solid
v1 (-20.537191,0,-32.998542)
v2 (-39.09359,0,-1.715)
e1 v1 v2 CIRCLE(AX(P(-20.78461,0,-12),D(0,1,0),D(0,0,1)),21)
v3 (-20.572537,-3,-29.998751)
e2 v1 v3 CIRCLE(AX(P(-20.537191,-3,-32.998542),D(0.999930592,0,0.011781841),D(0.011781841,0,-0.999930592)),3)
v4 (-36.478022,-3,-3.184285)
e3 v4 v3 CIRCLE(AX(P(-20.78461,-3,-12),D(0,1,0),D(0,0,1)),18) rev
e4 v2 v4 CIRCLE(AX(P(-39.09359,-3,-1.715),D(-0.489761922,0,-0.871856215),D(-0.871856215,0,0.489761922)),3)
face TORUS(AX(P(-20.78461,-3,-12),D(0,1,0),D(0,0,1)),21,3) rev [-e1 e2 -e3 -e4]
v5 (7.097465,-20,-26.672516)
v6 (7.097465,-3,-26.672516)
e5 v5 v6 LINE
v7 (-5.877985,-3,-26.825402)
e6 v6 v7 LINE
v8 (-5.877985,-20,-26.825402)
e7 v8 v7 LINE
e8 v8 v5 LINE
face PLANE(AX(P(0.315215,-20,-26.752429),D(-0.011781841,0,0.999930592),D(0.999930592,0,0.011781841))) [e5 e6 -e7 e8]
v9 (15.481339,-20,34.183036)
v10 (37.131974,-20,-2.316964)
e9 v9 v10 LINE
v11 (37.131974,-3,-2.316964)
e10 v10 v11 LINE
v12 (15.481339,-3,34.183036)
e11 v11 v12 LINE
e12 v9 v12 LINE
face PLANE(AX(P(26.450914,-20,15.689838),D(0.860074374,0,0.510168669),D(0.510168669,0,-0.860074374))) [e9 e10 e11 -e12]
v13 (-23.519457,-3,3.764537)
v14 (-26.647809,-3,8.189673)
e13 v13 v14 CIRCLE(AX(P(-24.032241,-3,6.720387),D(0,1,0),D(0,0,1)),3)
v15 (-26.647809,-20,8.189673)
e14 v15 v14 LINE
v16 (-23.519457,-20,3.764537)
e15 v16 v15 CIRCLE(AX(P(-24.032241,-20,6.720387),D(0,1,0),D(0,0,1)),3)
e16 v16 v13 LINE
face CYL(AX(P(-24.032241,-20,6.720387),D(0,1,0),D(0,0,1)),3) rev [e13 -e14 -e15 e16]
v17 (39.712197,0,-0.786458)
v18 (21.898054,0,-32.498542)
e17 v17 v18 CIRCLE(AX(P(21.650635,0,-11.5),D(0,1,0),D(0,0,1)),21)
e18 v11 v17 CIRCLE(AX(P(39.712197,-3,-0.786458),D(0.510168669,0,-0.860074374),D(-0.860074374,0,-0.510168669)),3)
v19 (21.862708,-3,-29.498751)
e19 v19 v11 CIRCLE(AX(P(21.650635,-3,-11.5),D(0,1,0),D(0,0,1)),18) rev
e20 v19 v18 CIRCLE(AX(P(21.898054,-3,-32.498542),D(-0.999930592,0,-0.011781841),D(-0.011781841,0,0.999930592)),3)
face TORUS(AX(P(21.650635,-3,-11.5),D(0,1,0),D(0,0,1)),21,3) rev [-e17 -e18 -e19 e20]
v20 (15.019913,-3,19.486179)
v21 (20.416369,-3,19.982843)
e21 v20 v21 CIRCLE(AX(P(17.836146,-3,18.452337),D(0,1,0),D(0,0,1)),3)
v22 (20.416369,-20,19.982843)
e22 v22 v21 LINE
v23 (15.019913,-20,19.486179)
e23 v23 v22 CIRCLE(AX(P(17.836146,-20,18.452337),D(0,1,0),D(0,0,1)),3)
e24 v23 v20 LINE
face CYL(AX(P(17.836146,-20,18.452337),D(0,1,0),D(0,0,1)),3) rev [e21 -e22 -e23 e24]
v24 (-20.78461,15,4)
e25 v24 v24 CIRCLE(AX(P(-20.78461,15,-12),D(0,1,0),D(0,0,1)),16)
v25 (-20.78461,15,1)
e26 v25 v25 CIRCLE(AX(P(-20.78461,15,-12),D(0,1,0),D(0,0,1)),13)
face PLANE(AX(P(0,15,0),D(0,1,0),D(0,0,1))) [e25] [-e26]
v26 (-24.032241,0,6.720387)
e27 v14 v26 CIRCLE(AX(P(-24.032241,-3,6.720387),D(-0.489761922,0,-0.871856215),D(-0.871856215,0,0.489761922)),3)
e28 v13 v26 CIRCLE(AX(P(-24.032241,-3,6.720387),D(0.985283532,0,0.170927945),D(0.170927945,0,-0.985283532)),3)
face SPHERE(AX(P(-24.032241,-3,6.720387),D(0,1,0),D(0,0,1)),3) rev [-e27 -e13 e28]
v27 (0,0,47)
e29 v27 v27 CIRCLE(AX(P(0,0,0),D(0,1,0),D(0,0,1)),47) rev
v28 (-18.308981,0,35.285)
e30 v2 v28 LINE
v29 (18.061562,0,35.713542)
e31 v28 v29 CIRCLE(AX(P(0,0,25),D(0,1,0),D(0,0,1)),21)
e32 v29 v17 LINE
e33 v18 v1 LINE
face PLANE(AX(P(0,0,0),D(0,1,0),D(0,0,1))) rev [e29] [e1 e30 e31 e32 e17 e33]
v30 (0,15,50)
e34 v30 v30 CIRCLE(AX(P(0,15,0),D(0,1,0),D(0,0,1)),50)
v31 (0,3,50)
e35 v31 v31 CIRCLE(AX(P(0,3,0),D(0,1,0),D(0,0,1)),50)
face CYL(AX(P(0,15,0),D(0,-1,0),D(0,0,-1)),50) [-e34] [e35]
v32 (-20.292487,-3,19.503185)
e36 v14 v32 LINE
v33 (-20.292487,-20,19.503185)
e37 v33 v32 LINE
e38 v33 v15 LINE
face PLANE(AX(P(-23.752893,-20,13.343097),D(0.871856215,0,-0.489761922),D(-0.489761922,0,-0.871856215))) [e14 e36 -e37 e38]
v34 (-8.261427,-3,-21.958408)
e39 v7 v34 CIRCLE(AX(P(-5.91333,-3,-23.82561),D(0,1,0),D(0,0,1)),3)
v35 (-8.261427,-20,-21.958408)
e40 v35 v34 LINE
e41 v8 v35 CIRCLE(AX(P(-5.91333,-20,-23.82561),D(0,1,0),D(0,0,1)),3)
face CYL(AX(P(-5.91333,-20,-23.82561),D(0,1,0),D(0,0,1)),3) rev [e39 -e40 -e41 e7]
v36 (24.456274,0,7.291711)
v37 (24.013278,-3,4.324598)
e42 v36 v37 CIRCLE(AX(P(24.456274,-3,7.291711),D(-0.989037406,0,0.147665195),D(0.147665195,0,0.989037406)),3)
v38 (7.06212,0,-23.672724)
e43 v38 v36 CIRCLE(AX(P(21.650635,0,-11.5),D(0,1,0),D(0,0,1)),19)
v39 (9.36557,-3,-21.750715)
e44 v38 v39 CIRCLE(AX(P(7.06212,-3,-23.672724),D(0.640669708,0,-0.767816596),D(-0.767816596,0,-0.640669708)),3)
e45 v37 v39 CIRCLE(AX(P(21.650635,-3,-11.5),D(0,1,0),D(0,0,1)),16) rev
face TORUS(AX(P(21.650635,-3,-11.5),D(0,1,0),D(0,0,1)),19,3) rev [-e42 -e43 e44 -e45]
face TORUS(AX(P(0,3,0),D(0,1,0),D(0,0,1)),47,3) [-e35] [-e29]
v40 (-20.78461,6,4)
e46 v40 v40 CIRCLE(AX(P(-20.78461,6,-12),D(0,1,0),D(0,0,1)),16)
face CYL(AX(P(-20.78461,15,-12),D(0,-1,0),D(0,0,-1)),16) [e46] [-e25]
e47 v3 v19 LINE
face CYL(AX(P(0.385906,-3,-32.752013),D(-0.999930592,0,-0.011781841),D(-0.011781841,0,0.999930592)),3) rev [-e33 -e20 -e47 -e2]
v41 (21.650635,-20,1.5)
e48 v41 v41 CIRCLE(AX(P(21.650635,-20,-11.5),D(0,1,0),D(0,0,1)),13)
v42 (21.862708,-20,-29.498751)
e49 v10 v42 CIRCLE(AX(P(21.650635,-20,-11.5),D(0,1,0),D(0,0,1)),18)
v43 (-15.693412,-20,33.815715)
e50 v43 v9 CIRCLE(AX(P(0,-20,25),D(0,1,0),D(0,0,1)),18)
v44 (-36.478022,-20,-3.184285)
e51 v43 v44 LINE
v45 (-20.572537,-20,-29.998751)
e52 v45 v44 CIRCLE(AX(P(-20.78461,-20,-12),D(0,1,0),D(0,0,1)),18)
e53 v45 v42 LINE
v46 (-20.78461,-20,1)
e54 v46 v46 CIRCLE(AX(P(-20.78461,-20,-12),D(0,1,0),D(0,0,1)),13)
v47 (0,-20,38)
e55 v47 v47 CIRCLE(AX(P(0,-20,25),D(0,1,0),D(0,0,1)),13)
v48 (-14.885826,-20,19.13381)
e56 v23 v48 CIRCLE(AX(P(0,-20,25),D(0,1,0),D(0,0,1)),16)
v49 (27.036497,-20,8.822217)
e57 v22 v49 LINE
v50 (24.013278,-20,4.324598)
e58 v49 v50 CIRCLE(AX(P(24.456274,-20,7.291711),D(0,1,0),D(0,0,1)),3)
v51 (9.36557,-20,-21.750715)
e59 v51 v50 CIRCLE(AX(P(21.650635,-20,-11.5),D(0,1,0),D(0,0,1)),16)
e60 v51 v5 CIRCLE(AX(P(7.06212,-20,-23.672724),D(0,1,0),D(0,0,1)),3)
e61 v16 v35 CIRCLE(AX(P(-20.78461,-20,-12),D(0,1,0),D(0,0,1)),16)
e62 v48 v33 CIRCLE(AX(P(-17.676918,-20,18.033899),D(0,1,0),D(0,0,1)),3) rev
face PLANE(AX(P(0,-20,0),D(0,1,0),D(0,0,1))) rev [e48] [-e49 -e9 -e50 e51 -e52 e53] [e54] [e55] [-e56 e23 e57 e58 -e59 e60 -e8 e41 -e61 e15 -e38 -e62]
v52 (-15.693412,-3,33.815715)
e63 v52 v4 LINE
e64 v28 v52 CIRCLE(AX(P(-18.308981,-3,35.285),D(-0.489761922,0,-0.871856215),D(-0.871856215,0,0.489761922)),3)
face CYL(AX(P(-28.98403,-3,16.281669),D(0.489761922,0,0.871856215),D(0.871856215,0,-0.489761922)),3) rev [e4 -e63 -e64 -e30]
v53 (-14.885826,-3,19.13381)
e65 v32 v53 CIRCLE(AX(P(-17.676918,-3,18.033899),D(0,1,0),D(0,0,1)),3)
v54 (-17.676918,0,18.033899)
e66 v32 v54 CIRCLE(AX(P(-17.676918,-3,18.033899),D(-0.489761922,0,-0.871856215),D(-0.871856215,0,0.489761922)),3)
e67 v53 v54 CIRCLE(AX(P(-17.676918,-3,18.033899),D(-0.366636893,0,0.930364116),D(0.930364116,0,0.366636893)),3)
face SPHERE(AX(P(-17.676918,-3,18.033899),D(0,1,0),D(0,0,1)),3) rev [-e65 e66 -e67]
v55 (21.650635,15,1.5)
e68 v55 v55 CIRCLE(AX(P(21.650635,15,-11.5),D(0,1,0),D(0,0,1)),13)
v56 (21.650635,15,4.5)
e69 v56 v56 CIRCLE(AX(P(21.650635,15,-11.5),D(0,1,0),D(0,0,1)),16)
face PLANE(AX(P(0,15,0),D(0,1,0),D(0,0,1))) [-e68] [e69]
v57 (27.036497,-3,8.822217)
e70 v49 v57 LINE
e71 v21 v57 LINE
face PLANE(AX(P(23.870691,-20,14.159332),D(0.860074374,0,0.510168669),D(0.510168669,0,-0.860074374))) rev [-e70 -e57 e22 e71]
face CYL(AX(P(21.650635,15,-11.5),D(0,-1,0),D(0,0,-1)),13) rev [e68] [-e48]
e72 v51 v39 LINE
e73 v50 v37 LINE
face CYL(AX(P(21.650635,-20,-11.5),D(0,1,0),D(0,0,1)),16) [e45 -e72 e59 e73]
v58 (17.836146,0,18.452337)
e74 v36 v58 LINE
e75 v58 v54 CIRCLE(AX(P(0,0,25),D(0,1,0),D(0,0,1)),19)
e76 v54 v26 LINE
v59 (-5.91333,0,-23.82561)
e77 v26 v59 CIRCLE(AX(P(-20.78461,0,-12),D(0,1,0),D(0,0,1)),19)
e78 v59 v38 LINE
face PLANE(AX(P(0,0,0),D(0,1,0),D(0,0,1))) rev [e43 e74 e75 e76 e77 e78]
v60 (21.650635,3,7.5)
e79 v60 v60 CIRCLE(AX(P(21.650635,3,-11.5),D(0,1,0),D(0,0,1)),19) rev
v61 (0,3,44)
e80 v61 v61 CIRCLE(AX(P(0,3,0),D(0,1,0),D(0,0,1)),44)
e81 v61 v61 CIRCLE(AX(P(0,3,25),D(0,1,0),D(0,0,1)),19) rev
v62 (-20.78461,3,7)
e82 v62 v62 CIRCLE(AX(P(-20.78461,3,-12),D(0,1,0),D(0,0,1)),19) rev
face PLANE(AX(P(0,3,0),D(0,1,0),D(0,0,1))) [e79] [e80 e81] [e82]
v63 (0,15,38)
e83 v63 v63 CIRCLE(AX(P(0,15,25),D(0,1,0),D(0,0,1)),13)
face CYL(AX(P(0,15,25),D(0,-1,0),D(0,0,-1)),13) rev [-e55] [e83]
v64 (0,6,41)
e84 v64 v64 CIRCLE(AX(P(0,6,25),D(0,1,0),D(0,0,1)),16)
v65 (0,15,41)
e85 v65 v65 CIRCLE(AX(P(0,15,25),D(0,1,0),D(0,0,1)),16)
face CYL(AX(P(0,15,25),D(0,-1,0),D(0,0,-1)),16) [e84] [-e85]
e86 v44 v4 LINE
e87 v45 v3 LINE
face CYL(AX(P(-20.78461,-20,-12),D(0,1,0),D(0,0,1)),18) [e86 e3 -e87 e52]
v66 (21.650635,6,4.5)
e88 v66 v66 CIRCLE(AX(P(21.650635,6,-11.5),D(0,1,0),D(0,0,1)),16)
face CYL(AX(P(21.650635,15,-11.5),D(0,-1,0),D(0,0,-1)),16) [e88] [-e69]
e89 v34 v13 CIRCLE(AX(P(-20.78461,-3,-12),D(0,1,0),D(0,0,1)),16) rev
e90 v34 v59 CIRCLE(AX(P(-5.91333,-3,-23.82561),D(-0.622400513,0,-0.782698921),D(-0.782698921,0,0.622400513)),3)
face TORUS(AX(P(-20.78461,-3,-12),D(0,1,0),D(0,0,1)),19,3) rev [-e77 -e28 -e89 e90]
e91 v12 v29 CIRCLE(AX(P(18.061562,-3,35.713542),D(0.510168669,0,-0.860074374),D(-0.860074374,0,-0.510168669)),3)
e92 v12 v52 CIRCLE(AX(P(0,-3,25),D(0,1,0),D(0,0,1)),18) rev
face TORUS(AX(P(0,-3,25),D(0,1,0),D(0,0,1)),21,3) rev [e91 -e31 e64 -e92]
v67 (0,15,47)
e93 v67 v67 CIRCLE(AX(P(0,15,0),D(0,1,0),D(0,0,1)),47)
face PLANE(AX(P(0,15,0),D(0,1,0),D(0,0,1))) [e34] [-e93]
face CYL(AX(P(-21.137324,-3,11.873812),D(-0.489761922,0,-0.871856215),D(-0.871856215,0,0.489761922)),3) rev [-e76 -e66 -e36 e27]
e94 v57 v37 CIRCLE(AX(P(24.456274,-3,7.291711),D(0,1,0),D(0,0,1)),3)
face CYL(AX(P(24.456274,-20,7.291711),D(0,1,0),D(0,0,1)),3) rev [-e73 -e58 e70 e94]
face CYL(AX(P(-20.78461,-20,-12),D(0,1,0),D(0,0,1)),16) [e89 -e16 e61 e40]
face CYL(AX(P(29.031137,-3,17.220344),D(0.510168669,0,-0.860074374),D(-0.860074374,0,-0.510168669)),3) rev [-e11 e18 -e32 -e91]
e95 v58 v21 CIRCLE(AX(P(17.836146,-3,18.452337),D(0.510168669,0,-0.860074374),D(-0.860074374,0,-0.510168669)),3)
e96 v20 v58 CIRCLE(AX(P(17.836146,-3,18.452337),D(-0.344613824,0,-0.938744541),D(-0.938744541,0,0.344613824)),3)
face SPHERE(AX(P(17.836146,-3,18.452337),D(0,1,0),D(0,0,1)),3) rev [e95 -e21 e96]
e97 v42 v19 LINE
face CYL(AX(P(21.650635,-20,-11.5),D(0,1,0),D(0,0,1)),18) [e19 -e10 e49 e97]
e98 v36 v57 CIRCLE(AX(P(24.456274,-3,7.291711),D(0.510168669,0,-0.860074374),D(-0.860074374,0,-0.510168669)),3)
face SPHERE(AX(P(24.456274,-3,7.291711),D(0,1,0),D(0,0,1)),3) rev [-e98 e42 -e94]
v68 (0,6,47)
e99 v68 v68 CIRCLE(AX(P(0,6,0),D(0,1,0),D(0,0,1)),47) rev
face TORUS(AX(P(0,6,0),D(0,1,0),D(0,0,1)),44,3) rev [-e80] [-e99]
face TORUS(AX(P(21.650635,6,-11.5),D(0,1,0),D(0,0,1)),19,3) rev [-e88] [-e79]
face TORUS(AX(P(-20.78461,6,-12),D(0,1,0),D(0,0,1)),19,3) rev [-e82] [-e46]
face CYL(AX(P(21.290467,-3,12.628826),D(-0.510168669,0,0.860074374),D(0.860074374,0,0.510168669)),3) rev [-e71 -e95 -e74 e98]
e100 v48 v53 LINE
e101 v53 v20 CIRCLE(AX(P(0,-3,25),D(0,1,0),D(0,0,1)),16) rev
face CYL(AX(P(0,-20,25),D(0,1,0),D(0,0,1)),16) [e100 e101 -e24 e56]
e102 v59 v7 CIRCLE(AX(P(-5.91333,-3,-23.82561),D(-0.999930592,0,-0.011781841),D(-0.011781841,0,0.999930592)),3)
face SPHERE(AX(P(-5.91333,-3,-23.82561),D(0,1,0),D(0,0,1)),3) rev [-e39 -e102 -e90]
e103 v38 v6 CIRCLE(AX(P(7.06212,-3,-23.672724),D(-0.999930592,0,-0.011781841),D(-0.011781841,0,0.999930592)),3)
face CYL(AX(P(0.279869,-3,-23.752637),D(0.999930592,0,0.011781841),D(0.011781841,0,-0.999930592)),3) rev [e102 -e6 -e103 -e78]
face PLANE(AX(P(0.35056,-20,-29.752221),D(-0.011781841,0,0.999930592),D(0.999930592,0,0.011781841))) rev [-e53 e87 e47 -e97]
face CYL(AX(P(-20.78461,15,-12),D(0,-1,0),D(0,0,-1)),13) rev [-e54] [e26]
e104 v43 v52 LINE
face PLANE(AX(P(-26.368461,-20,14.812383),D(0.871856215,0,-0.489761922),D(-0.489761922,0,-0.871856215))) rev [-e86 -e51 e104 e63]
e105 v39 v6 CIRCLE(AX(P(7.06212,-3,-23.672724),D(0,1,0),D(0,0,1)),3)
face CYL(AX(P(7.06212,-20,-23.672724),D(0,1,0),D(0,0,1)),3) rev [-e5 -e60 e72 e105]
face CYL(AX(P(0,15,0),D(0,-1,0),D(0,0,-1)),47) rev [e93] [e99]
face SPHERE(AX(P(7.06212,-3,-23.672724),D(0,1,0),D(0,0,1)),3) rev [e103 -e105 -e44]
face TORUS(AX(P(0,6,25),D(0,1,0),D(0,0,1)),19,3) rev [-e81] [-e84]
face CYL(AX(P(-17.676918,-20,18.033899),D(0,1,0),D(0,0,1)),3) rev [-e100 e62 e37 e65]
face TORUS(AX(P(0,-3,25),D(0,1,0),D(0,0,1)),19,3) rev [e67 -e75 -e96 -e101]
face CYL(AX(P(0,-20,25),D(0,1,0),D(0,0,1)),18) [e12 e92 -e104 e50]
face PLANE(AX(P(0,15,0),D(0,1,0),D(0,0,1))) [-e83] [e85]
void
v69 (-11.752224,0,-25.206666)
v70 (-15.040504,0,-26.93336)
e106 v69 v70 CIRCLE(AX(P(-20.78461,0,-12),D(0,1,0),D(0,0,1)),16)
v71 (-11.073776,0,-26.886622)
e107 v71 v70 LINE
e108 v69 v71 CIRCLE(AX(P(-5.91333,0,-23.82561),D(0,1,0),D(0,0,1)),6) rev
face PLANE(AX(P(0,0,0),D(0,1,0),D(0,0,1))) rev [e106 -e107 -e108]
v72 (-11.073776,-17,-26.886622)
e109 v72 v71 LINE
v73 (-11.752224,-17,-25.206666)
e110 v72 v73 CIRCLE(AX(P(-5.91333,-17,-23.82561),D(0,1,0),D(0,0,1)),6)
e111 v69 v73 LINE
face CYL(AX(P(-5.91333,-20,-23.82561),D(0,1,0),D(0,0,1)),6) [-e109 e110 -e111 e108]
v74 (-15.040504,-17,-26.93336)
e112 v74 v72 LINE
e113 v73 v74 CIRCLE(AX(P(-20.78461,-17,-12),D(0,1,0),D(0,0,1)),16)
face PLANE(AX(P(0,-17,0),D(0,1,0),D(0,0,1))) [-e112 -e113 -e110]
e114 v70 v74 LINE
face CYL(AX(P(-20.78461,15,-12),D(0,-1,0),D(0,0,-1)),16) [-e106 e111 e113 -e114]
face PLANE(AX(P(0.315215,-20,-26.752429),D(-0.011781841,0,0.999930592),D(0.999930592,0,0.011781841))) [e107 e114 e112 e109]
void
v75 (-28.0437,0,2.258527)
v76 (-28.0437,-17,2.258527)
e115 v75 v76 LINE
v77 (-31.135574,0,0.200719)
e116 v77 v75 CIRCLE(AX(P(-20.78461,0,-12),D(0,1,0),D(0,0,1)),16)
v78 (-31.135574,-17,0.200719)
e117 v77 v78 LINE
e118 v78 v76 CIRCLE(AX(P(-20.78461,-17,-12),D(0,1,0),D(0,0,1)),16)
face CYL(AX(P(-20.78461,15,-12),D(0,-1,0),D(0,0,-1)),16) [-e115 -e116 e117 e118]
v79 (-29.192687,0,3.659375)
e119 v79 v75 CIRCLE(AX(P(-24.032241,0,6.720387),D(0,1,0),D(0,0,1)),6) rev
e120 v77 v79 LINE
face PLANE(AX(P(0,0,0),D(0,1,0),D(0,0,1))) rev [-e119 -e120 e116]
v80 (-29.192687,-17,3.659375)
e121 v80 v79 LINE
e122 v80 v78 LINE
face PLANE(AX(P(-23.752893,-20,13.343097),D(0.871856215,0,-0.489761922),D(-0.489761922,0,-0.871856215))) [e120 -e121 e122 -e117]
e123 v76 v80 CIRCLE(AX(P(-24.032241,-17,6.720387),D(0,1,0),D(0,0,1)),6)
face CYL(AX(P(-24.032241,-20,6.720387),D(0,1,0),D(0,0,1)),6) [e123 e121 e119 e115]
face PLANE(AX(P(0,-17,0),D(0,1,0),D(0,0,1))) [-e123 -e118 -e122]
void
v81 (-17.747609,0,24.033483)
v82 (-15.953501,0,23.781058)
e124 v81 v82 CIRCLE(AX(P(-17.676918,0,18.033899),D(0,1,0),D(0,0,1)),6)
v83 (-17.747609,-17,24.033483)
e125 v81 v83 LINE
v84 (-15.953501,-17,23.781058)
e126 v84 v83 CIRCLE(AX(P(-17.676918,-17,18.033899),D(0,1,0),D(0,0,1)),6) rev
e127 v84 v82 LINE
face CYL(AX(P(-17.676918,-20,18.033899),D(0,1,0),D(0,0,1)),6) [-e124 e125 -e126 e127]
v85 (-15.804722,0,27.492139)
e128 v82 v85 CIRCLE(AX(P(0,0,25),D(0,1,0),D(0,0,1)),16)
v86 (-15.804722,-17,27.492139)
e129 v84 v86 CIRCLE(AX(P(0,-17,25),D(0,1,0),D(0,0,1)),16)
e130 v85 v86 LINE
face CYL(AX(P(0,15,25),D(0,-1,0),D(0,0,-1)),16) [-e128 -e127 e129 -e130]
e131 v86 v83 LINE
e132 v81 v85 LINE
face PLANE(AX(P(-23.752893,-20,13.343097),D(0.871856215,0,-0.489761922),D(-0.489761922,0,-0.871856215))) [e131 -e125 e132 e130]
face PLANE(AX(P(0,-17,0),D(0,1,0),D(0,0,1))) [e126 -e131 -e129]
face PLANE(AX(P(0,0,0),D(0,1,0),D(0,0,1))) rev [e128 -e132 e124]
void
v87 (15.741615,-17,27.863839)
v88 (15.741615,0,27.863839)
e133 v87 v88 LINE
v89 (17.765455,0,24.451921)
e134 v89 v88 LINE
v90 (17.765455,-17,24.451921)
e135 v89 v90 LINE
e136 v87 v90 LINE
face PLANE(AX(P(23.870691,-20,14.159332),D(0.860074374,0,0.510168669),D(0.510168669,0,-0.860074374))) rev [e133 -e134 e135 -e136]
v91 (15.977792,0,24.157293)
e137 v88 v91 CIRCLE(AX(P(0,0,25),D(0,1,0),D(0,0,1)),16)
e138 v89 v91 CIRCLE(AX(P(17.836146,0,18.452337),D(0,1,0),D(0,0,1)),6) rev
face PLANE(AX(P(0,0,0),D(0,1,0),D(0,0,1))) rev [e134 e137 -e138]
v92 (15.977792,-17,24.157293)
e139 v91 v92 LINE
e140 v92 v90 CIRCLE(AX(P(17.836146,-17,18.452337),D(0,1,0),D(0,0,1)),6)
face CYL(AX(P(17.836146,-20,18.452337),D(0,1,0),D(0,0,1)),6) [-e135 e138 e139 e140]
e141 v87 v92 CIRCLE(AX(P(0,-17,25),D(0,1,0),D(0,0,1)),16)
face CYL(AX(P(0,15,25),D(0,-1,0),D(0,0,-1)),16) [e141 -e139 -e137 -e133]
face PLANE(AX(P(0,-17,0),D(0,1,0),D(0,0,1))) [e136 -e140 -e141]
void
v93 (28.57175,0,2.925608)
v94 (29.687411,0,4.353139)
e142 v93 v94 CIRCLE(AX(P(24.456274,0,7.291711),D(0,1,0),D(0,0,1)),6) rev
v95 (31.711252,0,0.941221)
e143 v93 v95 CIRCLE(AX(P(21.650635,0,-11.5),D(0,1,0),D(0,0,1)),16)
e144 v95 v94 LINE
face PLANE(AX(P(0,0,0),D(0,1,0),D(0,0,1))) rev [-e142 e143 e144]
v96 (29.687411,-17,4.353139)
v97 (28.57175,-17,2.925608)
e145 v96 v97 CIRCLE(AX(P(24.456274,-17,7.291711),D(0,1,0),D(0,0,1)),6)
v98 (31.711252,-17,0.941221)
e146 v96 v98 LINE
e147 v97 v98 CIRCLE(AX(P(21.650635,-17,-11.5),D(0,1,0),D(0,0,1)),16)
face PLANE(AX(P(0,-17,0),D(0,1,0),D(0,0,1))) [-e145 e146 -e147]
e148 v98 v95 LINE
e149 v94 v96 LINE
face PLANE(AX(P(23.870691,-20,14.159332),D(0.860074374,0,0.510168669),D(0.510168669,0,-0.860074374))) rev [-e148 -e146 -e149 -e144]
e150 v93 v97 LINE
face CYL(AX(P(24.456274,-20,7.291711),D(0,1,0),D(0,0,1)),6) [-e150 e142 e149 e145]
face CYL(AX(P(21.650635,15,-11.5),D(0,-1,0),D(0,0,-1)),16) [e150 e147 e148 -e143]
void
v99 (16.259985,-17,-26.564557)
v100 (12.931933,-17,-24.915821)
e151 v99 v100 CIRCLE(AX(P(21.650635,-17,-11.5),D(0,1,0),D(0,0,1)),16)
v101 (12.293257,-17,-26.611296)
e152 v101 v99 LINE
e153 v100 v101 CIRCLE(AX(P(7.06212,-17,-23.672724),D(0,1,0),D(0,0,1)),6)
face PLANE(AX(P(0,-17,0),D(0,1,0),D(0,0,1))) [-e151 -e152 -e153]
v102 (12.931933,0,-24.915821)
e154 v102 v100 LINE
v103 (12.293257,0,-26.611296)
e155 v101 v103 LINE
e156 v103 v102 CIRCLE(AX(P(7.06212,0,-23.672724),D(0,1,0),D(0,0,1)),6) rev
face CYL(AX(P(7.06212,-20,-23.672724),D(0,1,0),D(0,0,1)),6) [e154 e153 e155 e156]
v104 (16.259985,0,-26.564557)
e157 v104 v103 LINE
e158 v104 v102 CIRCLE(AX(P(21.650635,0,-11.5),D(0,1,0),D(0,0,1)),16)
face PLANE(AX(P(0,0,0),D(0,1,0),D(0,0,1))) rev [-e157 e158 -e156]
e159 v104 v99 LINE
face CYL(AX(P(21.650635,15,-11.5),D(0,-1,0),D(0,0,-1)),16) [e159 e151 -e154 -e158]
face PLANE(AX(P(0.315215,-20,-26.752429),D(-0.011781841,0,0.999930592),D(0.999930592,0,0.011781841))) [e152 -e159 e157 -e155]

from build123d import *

# Parameters (mm, degrees)
SKETCH1_R           = 50
SKETCH1_R_2         = 13
BOSS_EXTRUDE1_DEPTH = 15
BOSS_EXTRUDE3_START = -20
SKETCH1_5_R         = 13
BOSS_EXTRUDE3_DEPTH = 20
SHELL1_START        = 3
SHELL1_OUTLINE_R    = 47
SHELL1_OUTLINE_R_2  = 16
SHELL1_DEPTH        = 12
SHELL1_START_2      = -17
SHELL1_2_DEPTH      = 20
FILLET3_R           = 3
FILLET4_R           = 3
FILLET5_R           = 3
SKETCH1_7_R         = 13
BOSS_EXTRUDE4_DEPTH = 3
FILLET6_R           = 3
FILLET7_R           = 3
FILLET8_R           = 3
FILLET9_R           = 3


# Read off the part's stored shape, not the designer's step: Shell1
with BuildPart() as part:
    # Sketch1 → Boss-Extrude1 (new body)
    # profile 1 of 3: a face of its own
    with BuildSketch(Plane(origin=(0, 0, 0), x_dir=(1, 0, 0), z_dir=(0, 1, 0))):
        with Locations(Location((0, 0, 0), (0, 0, 270))):
            Circle(SKETCH1_R)
        with BuildLine():
            ThreePointArc((-15.693411867, -33.815714604), (-0.212073133, -42.998750651), (15.481338733, -34.183036046))
            Line((15.481338733, -34.183036046), (37.131973828, 2.316963954))
            ThreePointArc((37.131973828, 2.316963954), (37.344046961, 20.315714604), (21.862708228, 29.498750651))
            Line((21.862708228, 29.498750651), (-20.572536557, 29.998750651))
            ThreePointArc((-20.572536557, 29.998750651), (-36.265948424, 21.183036046), (-36.478021557, 3.184285396))
            Line((-36.478021557, 3.184285396), (-15.693411867, -33.815714604))
        make_face(mode=Mode.SUBTRACT)
    # profile 2 of 3: a face of its own
    with BuildSketch(Plane(origin=(0, 0, 0), x_dir=(1, 0, 0), z_dir=(0, 1, 0))):
        with BuildLine():
            Line((-15.693411867, -33.815714604), (-36.478021557, 3.184285396))
            ThreePointArc((-36.478021557, 3.184285396), (-36.265948424, 21.183036046), (-20.572536557, 29.998750651))
            Line((-20.572536557, 29.998750651), (21.862708228, 29.498750651))
            ThreePointArc((21.862708228, 29.498750651), (37.344046961, 20.315714604), (37.131973828, 2.316963954))
            Line((37.131973828, 2.316963954), (15.481338733, -34.183036046))
            ThreePointArc((15.481338733, -34.183036046), (-0.212073133, -42.998750651), (-15.693411867, -33.815714604))
        make_face()
        with Locations(Location((-20.784609691, 12, 0), (0, 0, 270))):
            Circle(SKETCH1_R_2, mode=Mode.SUBTRACT)
        with Locations(Location((21.650635095, 11.5, 0), (0, 0, 270))):
            Circle(SKETCH1_R_2, mode=Mode.SUBTRACT)
        with Locations(Location((0, -25, 0), (0, 0, 270))):
            Circle(SKETCH1_R_2, mode=Mode.SUBTRACT)
        with BuildLine():
            ThreePointArc((-5.877984665, 26.825401524), (-8.607603848, 25.145037444), (-8.261426951, 21.958408209))
            ThreePointArc((-8.261426951, 21.958408209), (-7.023419706, 3.837301292), (-23.519456803, -3.764536507))
            ThreePointArc((-23.519456803, -3.764536507), (-26.481910808, -4.988591486), (-26.647809281, -8.189672869))
            Line((-26.647809281, -8.189672869), (-20.292486854, -19.503184805))
            ThreePointArc((-20.292486854, -19.503184805), (-17.472439282, -21.02692232), (-14.885825861, -19.133809716))
            ThreePointArc((-14.885825861, -19.133809716), (0.188509452, -9.001110533), (15.01991265, -19.486178822))
            ThreePointArc((15.01991265, -19.486178822), (17.56120236, -21.439711757), (20.416369394, -19.982843358))
            Line((20.416369394, -19.982843358), (27.036496923, -8.822216719))
            ThreePointArc((27.036496923, -8.822216719), (26.946068533, -5.618115124), (24.013278215, -4.324598494))
            ThreePointArc((24.013278215, -4.324598494), (7.700935658, 3.663809241), (9.365569557, 21.750715328))
            ThreePointArc((9.365569557, 21.750715328), (9.786733851, 24.928303244), (7.097465291, 26.672516227))
            Line((7.097465291, 26.672516227), (-5.877984665, 26.825401524))
        make_face(mode=Mode.SUBTRACT)
    # profile 3 of 3: a face of its own
    with BuildSketch(Plane(origin=(0, 0, 0), x_dir=(1, 0, 0), z_dir=(0, 1, 0))):
        with BuildLine():
            Line((-5.877984665, 26.825401524), (7.097465291, 26.672516227))
            ThreePointArc((7.097465291, 26.672516227), (9.786733851, 24.928303244), (9.365569557, 21.750715328))
            ThreePointArc((9.365569557, 21.750715328), (7.700935658, 3.663809241), (24.013278215, -4.324598494))
            ThreePointArc((24.013278215, -4.324598494), (26.946068533, -5.618115124), (27.036496923, -8.822216719))
            Line((27.036496923, -8.822216719), (20.416369394, -19.982843358))
            ThreePointArc((20.416369394, -19.982843358), (17.56120236, -21.439711757), (15.01991265, -19.486178822))
            ThreePointArc((15.01991265, -19.486178822), (0.188509452, -9.001110533), (-14.885825861, -19.133809716))
            ThreePointArc((-14.885825861, -19.133809716), (-17.472439282, -21.02692232), (-20.292486854, -19.503184805))
            Line((-20.292486854, -19.503184805), (-26.647809281, -8.189672869))
            ThreePointArc((-26.647809281, -8.189672869), (-26.481910808, -4.988591486), (-23.519456803, -3.764536507))
            ThreePointArc((-23.519456803, -3.764536507), (-7.023419706, 3.837301292), (-8.261426951, 21.958408209))
            ThreePointArc((-8.261426951, 21.958408209), (-8.607603848, 25.145037444), (-5.877984665, 26.825401524))
        make_face()
    extrude(amount=BOSS_EXTRUDE1_DEPTH)

    # Sketch1<5> → Boss-Extrude3 (add)
    with BuildSketch(Plane(origin=(0, 0, 0), x_dir=(1, 0, 0), z_dir=(0, 1, 0)).offset(BOSS_EXTRUDE3_START)):
        with BuildLine():
            Line((-15.693411867, -33.815714604), (-36.478021557, 3.184285396))
            ThreePointArc((-36.478021557, 3.184285396), (-36.265948424, 21.183036046), (-20.572536557, 29.998750651))
            Line((-20.572536557, 29.998750651), (21.862708228, 29.498750651))
            ThreePointArc((21.862708228, 29.498750651), (37.344046961, 20.315714604), (37.131973828, 2.316963954))
            Line((37.131973828, 2.316963954), (15.481338733, -34.183036046))
            ThreePointArc((15.481338733, -34.183036046), (-0.212073133, -42.998750651), (-15.693411867, -33.815714604))
        make_face()
        with Locations(Location((-20.784609691, 12, 0), (0, 0, 270))):
            Circle(SKETCH1_5_R, mode=Mode.SUBTRACT)
        with Locations(Location((21.650635095, 11.5, 0), (0, 0, 270))):
            Circle(SKETCH1_5_R, mode=Mode.SUBTRACT)
        with Locations(Location((0, -25, 0), (0, 0, 270))):
            Circle(SKETCH1_5_R, mode=Mode.SUBTRACT)
        with BuildLine():
            ThreePointArc((-5.877984665, 26.825401524), (-8.607603848, 25.145037444), (-8.261426951, 21.958408209))
            ThreePointArc((-8.261426951, 21.958408209), (-7.023419706, 3.837301292), (-23.519456803, -3.764536507))
            ThreePointArc((-23.519456803, -3.764536507), (-26.481910808, -4.988591486), (-26.647809281, -8.189672869))
            Line((-26.647809281, -8.189672869), (-20.292486854, -19.503184805))
            ThreePointArc((-20.292486854, -19.503184805), (-17.472439282, -21.02692232), (-14.885825861, -19.133809716))
            ThreePointArc((-14.885825861, -19.133809716), (0.188509452, -9.001110533), (15.01991265, -19.486178822))
            ThreePointArc((15.01991265, -19.486178822), (17.56120236, -21.439711757), (20.416369394, -19.982843358))
            Line((20.416369394, -19.982843358), (27.036496923, -8.822216719))
            ThreePointArc((27.036496923, -8.822216719), (26.946068533, -5.618115124), (24.013278215, -4.324598494))
            ThreePointArc((24.013278215, -4.324598494), (7.700935658, 3.663809241), (9.365569557, 21.750715328))
            ThreePointArc((9.365569557, 21.750715328), (9.786733851, 24.928303244), (7.097465291, 26.672516227))
            Line((7.097465291, 26.672516227), (-5.877984665, 26.825401524))
        make_face(mode=Mode.SUBTRACT)
    extrude(amount=BOSS_EXTRUDE3_DEPTH)

    # Shell1 outline → Shell1 (cut)
    with BuildSketch(Plane(origin=(0, 0, 0), x_dir=(1, 0, 0), z_dir=(0, 1, 0)).offset(SHELL1_START)):
        Circle(SHELL1_OUTLINE_R)
        with Locations((-20.784609691, 12)):
            Circle(SHELL1_OUTLINE_R_2, mode=Mode.SUBTRACT)
        with Locations((0, -25)):
            Circle(SHELL1_OUTLINE_R_2, mode=Mode.SUBTRACT)
        with Locations((21.650635095, 11.5)):
            Circle(SHELL1_OUTLINE_R_2, mode=Mode.SUBTRACT)
    extrude(amount=SHELL1_DEPTH, mode=Mode.SUBTRACT)

    # Shell1 2 outline → Shell1 2 (cut)
    with BuildSketch(Plane(origin=(0, 0, 0), x_dir=(1, 0, 0), z_dir=(0, 1, 0)).offset(SHELL1_START_2)):
        with BuildLine():
            ThreePointArc((-15.040504166, 26.933360363), (-13.346092405, 26.165749559), (-11.752224337, 25.206665545))
            ThreePointArc((-11.752224337, 25.206665545), (-11.476776556, 26.07239957), (-11.073776432, 26.886621764))
            Line((-11.073776432, 26.886621764), (-15.040504166, 26.933360363))
        make_face()
        with BuildLine():
            ThreePointArc((-29.192686881, -3.659375086), (-28.671373939, -2.915332279), (-28.043700248, -2.258527423))
            ThreePointArc((-28.043700248, -2.258527423), (-29.64954915, -1.319641451), (-31.135573935, -0.200718799))
            Line((-31.135573935, -0.200718799), (-29.192686881, -3.659375086))
        make_face()
        with BuildLine():
            Line((-17.747609254, -24.033482588), (-15.8047222, -27.492138875))
            ThreePointArc((-15.8047222, -27.492138875), (-15.987157625, -25.640929843), (-15.953500538, -23.781057599))
            ThreePointArc((-15.953500538, -23.781057599), (-16.840972087, -23.975379836), (-17.747609254, -24.033482588))
        make_face()
        with BuildLine():
            ThreePointArc((15.977792248, -24.157293119), (15.967617596, -26.017442048), (15.741614547, -27.863838589))
            Line((15.741614547, -27.863838589), (17.765455227, -24.451920901))
            ThreePointArc((17.765455227, -24.451920901), (16.860438784, -24.372472053), (15.977792248, -24.157293119))
        make_face()
        with BuildLine():
            ThreePointArc((28.571750279, -2.925607946), (29.183774047, -3.597019734), (29.687411089, -4.353139176))
            Line((29.687411089, -4.353139176), (31.71125177, -0.941221488))
            ThreePointArc((31.71125177, -0.941221488), (30.199275433, -2.024819716), (28.571750279, -2.925607946))
        make_face()
        with BuildLine():
            ThreePointArc((12.293257058, 26.611295987), (12.676960559, 25.787804333), (12.931933404, 24.915820543))
            ThreePointArc((12.931933404, 24.915820543), (14.547956958, 25.8370835), (16.259984792, 26.564557389))
            Line((16.259984792, 26.564557389), (12.293257058, 26.611295987))
        make_face()
    extrude(amount=SHELL1_2_DEPTH, mode=Mode.SUBTRACT)

    # Fillet3
    fillet3_edges = [part.edges().sort_by_distance(p)[0] for p in [
        (0, 0, -50),
    ]]
    fillet(fillet3_edges, radius=FILLET3_R)

    # Fillet4
    fillet4_edges = [part.edges().sort_by_distance(p)[0] for p in [
        (-26.085716712, 0, 15.315714604),
        (0.645085835, 0, -29.748750651),
        (-0.212073133, 0, 42.998750651),
        (26.306656281, 0, 15.933036046),
        (37.344046961, 0, -20.315714604),
        (-36.265948424, 0, -21.183036046),
    ]]
    fillet(fillet4_edges, radius=FILLET4_R)

    # Fillet5
    fillet5_edges = [part.edges().sort_by_distance(p)[0] for p in [
        (-8.607603848, 0, -25.145037444),
        (-26.481910808, 0, 4.988591486),
        (17.56120236, 0, 21.439711757),
        (23.726433158, 0, 14.402530039),
        (26.946068533, 0, 5.618115124),
        (9.786733851, 0, -24.928303244),
        (0.609740313, 0, -26.748958876),
        (7.700935658, 0, -3.663809241),
        (0.188509452, 0, 9.001110533),
        (-17.472439282, 0, 21.02692232),
        (-23.470148068, 0, 13.846428837),
        (-7.023419706, 0, -3.837301292),
    ]]
    fillet(fillet5_edges, radius=FILLET5_R)

    # Sketch1<7> → Boss-Extrude4 (add)
    with BuildSketch(Plane(origin=(0, 0, 0), x_dir=(1, 0, 0), z_dir=(0, 1, 0))):
        with BuildLine():
            Line((-15.693411867, -33.815714604), (-36.478021557, 3.184285396))
            ThreePointArc((-36.478021557, 3.184285396), (-36.265948424, 21.183036046), (-20.572536557, 29.998750651))
            Line((-20.572536557, 29.998750651), (21.862708228, 29.498750651))
            ThreePointArc((21.862708228, 29.498750651), (37.344046961, 20.315714604), (37.131973828, 2.316963954))
            Line((37.131973828, 2.316963954), (15.481338733, -34.183036046))
            ThreePointArc((15.481338733, -34.183036046), (-0.212073133, -42.998750651), (-15.693411867, -33.815714604))
        make_face()
        with Locations(Location((-20.784609691, 12, 0), (0, 0, 270))):
            Circle(SKETCH1_7_R, mode=Mode.SUBTRACT)
        with Locations(Location((21.650635095, 11.5, 0), (0, 0, 270))):
            Circle(SKETCH1_7_R, mode=Mode.SUBTRACT)
        with Locations(Location((0, -25, 0), (0, 0, 270))):
            Circle(SKETCH1_7_R, mode=Mode.SUBTRACT)
        with BuildLine():
            ThreePointArc((-5.877984665, 26.825401524), (-8.607603848, 25.145037444), (-8.261426951, 21.958408209))
            ThreePointArc((-8.261426951, 21.958408209), (-7.023419706, 3.837301292), (-23.519456803, -3.764536507))
            ThreePointArc((-23.519456803, -3.764536507), (-26.481910808, -4.988591486), (-26.647809281, -8.189672869))
            Line((-26.647809281, -8.189672869), (-20.292486854, -19.503184805))
            ThreePointArc((-20.292486854, -19.503184805), (-17.472439282, -21.02692232), (-14.885825861, -19.133809716))
            ThreePointArc((-14.885825861, -19.133809716), (0.188509452, -9.001110533), (15.01991265, -19.486178822))
            ThreePointArc((15.01991265, -19.486178822), (17.56120236, -21.439711757), (20.416369394, -19.982843358))
            Line((20.416369394, -19.982843358), (27.036496923, -8.822216719))
            ThreePointArc((27.036496923, -8.822216719), (26.946068533, -5.618115124), (24.013278215, -4.324598494))
            ThreePointArc((24.013278215, -4.324598494), (7.700935658, 3.663809241), (9.365569557, 21.750715328))
            ThreePointArc((9.365569557, 21.750715328), (9.786733851, 24.928303244), (7.097465291, 26.672516227))
            Line((7.097465291, 26.672516227), (-5.877984665, 26.825401524))
        make_face(mode=Mode.SUBTRACT)
    extrude(amount=BOSS_EXTRUDE4_DEPTH)

    # Fillet6
    fillet6_edges = [part.edges().sort_by_distance(p)[0] for p in [
        (1.249888954, 3, 40.951105843),
    ]]
    fillet(fillet6_edges, radius=FILLET6_R)

    # Fillet7
    fillet7_edges = [part.edges().sort_by_distance(p)[0] for p in [
        (7.700935658, 3, -3.663809241),
    ]]
    fillet(fillet7_edges, radius=FILLET7_R)

    # Fillet8
    fillet8_edges = [part.edges().sort_by_distance(p)[0] for p in [
        (-12.422356673, 3, 1.640847644),
    ]]
    fillet(fillet8_edges, radius=FILLET8_R)

    # Fillet9
    fillet9_edges = [part.edges().sort_by_distance(p)[0] for p in [
        (-47, 3, 0),
    ]]
    fillet(fillet9_edges, radius=FILLET9_R - 0.0001)  # a hair under: the kernel refuses the full size


solid = part.part
